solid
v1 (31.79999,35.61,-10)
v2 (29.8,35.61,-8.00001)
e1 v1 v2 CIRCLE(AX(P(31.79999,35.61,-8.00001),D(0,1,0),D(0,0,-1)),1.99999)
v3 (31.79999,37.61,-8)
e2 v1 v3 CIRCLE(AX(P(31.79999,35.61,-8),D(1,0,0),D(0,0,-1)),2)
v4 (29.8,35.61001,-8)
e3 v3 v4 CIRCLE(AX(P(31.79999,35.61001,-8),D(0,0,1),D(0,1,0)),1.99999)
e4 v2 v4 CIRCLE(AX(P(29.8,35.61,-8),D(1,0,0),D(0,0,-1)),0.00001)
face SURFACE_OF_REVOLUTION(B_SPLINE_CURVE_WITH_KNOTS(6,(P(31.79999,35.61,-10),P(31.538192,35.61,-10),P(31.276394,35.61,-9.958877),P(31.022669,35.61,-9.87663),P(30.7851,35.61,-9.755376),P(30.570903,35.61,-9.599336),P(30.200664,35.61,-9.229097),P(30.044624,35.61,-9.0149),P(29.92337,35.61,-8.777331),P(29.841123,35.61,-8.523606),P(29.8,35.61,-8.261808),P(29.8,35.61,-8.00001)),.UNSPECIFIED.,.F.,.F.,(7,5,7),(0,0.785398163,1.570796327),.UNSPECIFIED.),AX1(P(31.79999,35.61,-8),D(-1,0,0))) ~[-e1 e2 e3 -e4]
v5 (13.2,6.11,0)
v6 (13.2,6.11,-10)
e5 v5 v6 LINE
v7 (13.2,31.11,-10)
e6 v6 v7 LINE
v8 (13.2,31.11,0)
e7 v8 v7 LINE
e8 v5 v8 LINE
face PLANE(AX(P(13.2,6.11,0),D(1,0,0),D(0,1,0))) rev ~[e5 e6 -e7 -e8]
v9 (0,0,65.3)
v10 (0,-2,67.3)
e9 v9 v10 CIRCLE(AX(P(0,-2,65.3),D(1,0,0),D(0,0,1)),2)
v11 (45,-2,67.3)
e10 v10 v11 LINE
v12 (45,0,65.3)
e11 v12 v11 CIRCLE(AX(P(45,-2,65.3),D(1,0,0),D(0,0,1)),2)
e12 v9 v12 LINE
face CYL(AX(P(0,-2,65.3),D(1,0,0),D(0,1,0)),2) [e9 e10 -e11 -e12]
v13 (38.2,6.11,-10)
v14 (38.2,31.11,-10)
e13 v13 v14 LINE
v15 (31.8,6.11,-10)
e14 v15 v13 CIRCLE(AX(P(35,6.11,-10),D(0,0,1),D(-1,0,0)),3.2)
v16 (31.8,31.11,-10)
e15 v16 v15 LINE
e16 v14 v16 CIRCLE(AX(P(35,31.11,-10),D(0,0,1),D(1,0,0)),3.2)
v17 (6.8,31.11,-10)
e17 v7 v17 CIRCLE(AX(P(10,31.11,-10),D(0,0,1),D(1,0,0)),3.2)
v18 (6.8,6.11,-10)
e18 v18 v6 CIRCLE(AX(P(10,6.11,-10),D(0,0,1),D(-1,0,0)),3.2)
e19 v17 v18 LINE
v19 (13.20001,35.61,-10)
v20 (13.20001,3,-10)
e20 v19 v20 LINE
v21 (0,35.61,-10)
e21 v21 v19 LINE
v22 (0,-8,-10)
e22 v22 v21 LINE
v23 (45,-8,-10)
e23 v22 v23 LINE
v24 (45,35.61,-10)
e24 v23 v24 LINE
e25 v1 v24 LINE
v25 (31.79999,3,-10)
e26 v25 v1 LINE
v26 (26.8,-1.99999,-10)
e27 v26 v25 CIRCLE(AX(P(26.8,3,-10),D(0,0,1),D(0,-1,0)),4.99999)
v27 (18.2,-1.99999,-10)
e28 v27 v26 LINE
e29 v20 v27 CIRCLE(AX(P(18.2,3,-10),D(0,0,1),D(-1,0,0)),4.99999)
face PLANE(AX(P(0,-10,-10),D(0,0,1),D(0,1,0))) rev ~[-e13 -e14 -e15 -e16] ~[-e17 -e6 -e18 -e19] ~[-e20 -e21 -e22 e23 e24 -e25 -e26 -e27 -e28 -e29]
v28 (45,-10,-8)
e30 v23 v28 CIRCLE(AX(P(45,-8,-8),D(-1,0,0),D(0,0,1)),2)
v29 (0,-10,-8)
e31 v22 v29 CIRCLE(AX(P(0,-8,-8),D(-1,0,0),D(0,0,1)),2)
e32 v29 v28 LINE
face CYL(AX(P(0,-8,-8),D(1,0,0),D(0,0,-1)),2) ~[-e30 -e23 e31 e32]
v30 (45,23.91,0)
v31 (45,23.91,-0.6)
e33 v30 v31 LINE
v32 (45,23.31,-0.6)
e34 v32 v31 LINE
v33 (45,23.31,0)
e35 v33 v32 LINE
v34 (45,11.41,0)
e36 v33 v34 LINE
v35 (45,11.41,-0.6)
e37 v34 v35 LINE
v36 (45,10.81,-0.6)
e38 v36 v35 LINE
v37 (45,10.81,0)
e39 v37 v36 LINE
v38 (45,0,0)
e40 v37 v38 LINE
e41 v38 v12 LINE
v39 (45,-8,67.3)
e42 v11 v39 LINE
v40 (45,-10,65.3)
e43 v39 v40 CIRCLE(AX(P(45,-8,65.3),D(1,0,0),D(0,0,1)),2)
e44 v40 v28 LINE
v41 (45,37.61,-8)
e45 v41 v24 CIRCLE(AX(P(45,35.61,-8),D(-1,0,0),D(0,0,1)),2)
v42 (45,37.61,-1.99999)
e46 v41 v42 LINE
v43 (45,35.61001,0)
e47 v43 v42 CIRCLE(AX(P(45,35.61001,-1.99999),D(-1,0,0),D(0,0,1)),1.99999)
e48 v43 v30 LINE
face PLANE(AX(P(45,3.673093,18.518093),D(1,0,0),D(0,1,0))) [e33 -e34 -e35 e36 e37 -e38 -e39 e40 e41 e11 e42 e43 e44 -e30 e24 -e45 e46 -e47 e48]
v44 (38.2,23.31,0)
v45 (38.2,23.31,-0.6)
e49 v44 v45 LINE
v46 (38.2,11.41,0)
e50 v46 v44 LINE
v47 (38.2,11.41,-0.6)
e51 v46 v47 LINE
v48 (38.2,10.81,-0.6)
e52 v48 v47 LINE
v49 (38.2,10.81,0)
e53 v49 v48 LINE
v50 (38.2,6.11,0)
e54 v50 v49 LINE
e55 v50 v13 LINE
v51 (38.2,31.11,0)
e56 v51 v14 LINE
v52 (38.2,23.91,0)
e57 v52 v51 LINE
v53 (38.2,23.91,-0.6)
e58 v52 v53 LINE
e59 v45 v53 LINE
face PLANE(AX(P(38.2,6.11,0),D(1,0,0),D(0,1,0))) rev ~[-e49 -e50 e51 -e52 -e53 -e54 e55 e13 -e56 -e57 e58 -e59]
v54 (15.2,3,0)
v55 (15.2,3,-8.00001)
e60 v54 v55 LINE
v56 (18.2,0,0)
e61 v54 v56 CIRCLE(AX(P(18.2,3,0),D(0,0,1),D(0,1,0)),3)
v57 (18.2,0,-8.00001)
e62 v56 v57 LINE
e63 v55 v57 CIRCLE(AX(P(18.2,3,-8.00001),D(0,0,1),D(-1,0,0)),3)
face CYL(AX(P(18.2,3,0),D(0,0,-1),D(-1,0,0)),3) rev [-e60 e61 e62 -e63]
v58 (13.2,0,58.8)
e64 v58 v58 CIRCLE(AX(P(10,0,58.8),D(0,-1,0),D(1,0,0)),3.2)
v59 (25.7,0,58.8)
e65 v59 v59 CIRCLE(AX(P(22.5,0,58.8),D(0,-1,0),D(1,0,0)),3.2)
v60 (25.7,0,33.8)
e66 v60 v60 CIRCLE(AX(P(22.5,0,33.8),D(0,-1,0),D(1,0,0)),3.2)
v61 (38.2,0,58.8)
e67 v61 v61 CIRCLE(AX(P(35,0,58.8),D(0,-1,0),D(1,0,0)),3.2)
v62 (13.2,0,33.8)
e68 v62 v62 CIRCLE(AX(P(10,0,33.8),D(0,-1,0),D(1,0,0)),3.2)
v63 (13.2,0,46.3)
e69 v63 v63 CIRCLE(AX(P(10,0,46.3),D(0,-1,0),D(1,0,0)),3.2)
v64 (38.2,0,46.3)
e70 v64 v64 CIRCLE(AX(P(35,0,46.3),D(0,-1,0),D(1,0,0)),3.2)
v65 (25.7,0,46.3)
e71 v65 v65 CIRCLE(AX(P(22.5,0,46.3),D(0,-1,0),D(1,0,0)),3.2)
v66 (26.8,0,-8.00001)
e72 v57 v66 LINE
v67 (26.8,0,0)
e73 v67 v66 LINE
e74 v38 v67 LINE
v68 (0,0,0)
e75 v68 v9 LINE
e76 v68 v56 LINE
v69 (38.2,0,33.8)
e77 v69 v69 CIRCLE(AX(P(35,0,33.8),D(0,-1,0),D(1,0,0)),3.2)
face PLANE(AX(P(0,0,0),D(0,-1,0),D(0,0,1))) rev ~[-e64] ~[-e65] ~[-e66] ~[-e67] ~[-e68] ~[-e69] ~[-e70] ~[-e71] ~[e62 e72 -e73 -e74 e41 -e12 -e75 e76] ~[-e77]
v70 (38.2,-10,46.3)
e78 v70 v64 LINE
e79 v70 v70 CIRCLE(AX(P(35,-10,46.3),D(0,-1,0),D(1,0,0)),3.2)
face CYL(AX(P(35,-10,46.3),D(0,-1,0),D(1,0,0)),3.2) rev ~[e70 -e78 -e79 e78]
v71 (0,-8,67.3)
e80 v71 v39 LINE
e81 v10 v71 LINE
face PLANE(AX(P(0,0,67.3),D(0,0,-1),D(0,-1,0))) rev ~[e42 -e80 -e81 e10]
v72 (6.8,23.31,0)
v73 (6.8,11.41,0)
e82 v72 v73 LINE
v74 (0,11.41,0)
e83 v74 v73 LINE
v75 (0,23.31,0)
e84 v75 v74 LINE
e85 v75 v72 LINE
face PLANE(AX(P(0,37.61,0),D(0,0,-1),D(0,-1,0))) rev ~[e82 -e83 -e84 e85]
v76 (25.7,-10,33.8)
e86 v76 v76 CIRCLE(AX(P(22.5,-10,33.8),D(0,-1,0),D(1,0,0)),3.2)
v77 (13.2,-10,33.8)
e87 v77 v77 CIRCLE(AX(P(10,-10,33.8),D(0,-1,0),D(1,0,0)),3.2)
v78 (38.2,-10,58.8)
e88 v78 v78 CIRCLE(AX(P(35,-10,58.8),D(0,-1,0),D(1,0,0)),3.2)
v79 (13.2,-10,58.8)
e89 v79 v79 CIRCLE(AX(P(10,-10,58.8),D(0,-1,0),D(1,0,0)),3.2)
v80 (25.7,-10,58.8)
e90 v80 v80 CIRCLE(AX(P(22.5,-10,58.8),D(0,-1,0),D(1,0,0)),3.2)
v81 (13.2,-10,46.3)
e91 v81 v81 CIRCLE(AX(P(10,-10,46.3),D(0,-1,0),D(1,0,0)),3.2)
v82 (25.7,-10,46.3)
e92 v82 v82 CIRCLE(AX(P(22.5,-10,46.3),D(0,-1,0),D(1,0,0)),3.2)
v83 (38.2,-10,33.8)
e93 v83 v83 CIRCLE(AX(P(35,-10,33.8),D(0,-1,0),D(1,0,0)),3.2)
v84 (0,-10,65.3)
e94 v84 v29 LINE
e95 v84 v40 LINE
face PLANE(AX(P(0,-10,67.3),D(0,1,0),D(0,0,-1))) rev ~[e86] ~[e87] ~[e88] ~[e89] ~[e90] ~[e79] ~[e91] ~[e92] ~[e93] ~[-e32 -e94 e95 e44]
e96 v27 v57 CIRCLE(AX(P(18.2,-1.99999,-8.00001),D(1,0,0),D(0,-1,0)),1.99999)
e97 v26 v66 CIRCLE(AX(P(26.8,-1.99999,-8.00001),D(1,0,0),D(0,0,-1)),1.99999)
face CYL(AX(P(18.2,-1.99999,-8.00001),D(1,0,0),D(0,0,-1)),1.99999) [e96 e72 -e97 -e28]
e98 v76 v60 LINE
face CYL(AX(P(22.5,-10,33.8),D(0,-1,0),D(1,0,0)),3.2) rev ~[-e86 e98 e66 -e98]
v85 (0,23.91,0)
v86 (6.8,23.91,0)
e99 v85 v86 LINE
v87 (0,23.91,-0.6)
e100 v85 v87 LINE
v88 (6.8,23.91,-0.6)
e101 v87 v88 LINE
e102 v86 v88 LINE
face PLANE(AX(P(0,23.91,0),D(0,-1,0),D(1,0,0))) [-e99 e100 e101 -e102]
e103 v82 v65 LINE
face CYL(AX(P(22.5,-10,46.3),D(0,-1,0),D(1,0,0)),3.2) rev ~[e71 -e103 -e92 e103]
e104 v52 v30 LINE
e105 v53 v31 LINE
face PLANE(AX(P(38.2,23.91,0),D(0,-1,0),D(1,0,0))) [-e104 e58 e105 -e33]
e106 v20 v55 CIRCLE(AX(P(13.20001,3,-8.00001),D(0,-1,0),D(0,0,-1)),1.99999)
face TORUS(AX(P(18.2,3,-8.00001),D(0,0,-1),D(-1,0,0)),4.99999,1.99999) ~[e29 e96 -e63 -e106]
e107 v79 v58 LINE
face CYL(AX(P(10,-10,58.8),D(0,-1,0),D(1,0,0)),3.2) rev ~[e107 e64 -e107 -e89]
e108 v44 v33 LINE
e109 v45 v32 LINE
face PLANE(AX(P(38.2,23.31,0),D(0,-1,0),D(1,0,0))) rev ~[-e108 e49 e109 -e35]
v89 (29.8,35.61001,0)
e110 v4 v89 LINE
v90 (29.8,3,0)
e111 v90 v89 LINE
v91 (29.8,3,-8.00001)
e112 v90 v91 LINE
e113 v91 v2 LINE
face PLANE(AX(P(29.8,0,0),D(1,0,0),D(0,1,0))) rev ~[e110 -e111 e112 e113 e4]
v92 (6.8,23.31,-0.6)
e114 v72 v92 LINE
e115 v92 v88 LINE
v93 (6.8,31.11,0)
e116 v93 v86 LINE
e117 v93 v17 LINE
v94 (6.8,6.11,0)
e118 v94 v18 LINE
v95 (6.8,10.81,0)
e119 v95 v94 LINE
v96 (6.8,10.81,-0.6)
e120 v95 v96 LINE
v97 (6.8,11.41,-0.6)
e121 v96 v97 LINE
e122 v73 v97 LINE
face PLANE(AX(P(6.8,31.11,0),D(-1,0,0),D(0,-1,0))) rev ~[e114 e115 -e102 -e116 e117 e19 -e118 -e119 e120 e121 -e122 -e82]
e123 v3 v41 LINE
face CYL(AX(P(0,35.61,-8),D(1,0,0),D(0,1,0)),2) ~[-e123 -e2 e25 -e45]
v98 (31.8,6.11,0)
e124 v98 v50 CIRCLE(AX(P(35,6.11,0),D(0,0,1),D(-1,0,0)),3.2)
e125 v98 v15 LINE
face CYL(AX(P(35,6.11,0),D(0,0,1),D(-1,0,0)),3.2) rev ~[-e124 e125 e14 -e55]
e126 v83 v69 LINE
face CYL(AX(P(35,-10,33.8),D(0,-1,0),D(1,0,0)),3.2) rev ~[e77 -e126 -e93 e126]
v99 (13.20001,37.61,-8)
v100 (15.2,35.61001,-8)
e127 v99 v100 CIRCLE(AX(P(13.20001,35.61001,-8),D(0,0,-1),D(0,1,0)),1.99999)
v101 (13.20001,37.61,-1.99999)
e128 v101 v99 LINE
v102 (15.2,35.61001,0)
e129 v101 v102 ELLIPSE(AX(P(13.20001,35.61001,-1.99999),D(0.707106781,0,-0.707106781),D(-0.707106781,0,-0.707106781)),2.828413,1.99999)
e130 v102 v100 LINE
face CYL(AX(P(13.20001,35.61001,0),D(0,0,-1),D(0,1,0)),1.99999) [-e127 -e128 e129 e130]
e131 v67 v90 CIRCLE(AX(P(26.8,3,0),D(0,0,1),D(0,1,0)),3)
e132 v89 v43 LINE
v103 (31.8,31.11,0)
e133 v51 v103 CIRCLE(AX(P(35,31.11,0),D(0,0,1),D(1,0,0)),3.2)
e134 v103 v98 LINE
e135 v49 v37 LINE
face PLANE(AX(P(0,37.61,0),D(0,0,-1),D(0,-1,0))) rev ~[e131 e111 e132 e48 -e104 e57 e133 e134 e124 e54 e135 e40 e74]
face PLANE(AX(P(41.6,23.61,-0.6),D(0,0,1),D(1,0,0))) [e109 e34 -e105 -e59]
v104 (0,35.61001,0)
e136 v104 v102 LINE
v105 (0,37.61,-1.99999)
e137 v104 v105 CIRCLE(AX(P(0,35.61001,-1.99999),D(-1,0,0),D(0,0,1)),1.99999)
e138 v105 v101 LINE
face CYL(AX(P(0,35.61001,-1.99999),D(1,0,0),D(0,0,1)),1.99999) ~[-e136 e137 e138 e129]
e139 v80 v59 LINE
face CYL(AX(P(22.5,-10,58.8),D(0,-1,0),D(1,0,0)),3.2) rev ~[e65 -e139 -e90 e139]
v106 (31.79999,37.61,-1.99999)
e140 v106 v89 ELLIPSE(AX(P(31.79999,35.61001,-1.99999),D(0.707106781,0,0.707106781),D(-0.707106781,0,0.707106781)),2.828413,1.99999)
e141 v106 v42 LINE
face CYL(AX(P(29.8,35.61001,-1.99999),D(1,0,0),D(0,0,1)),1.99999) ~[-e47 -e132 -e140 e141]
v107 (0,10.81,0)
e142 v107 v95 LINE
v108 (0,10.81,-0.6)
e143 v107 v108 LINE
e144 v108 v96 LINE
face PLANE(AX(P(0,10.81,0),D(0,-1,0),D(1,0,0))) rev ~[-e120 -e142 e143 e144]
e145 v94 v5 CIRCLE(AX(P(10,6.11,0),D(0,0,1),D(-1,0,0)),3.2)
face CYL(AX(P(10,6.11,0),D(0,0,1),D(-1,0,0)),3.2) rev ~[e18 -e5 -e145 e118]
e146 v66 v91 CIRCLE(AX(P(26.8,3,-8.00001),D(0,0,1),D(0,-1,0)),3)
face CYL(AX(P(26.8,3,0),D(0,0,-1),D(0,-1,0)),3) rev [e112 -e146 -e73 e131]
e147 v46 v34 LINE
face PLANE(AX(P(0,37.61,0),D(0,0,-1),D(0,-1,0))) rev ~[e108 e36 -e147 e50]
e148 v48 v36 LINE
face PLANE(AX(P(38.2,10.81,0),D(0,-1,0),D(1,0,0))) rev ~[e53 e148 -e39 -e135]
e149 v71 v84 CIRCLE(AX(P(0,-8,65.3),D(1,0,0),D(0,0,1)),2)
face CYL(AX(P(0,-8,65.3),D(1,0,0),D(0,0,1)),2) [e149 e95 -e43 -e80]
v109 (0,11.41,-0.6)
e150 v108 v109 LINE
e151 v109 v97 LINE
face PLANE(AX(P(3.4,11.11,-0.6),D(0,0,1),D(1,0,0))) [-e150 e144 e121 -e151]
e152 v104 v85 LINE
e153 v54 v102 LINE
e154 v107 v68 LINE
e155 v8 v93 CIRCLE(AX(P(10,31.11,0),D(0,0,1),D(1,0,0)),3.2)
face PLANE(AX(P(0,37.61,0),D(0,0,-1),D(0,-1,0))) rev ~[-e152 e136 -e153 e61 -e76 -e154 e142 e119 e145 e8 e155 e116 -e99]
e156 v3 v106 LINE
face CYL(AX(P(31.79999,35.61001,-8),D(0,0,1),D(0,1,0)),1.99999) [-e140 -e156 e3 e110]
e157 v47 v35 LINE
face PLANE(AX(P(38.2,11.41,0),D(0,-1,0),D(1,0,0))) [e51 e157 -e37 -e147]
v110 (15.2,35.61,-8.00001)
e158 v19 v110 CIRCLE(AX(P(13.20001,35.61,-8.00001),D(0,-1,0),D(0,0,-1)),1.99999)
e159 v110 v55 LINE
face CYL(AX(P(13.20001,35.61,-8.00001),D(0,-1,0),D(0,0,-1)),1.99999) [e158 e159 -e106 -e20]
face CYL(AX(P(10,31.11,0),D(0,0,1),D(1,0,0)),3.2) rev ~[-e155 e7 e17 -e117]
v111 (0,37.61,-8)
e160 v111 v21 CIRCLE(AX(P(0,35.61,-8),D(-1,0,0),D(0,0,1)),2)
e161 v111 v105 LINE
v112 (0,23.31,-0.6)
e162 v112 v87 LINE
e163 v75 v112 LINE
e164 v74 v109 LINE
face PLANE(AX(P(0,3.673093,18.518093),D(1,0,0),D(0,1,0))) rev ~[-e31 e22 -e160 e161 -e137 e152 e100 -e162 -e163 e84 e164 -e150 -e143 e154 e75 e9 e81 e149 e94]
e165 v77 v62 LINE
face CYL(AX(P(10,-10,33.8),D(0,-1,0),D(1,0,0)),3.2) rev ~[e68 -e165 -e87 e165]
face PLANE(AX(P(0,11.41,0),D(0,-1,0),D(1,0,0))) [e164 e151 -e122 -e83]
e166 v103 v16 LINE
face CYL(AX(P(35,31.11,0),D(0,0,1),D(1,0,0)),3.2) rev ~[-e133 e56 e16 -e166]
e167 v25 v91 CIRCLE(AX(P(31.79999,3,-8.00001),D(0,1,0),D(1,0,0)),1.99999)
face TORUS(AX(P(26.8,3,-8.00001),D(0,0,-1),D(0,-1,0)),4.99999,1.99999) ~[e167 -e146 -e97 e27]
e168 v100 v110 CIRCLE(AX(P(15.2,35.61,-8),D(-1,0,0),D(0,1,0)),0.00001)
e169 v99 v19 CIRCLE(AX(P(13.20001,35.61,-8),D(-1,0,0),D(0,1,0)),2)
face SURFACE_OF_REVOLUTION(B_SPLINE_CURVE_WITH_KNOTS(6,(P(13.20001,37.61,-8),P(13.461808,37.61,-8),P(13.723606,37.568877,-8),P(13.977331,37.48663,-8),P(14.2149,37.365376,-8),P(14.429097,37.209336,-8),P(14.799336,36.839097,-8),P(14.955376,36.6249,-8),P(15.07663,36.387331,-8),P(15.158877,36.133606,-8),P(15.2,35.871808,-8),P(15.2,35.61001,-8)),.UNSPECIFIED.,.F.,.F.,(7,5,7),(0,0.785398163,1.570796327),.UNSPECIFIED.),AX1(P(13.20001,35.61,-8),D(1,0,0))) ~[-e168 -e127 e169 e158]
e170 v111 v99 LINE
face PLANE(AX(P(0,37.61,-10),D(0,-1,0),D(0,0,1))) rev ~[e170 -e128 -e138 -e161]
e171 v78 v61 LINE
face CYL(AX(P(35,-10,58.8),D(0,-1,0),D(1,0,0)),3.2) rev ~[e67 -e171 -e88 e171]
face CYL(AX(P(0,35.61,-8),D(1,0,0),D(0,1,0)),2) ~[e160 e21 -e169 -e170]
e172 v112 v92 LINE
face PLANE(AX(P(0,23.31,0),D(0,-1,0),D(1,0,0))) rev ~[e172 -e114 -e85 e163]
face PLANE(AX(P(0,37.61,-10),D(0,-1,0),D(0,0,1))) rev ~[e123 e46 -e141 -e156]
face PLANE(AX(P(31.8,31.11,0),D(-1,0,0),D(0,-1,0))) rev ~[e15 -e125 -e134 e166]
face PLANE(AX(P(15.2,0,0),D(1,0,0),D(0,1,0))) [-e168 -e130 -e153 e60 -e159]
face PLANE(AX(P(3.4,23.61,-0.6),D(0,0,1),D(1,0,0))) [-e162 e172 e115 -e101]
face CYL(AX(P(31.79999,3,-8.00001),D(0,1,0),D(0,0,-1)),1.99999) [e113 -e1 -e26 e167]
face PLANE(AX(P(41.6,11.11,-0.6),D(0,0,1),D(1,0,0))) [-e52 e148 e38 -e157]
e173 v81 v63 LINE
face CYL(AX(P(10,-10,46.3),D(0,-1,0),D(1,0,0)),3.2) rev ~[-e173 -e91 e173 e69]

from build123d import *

# Parameters (mm, degrees)
F1_DEPTH  = 45
F3_DEPTH  = 10
F4_R      = 2
F5_R      = 3.2
F6_DEPTH  = 10
F2_W      = 14.6
F2_H      = 37.61
F7_DEPTH  = 10
F8_R      = 3
F9_R      = 1.99999
F2_W_2    = 6.8
F2_H_2    = 0.6
F10_DEPTH = 0.6


# Not quite as in the source:
# - a fillet or chamfer is up to 0.001 mm smaller than in the source, because OpenCascade refuses the exact size
# - a feature names something its author has since deleted; it is built from what else it names


with BuildPart() as f1:
    # F0 (on Right) → F1 (new body)
    with BuildSketch(Plane.YZ):
        Polygon((37.61, 0), (0, 0), (0, 67.3), (-10, 67.3), (-10, -10), (37.61, -10), align=None)
    extrude(amount=F1_DEPTH)

    # F2 (on face) → F3 (cut)
    with BuildSketch(Plane.XY):
        with BuildLine():
            Line((13.2, 6.11), (13.2, 31.11))
            ThreePointArc((13.2, 31.11), (10, 34.31), (6.8, 31.11))
            Line((6.8, 31.11), (6.8, 23.91))
            Line((6.8, 23.91), (6.8, 23.31))
            Line((6.8, 23.31), (6.8, 11.41))
            Line((6.8, 11.41), (6.8, 10.81))
            Line((6.8, 10.81), (6.8, 6.11))
            ThreePointArc((6.8, 6.11), (10, 2.91), (13.2, 6.11))
        make_face()
        with BuildLine():
            Line((38.2, 23.31), (38.2, 23.91))
            Line((38.2, 23.91), (38.2, 31.11))
            ThreePointArc((38.2, 31.11), (35, 34.31), (31.8, 31.11))
            Line((31.8, 31.11), (31.8, 6.11))
            ThreePointArc((31.8, 6.11), (35, 2.91), (38.2, 6.11))
            Line((38.2, 6.11), (38.2, 10.81))
            Line((38.2, 10.81), (38.2, 11.41))
            Line((38.2, 11.41), (38.2, 23.31))
        make_face()
    extrude(amount=-F3_DEPTH, mode=Mode.SUBTRACT)

    # F4
    f4_edges = [f1.edges().sort_by_distance(p)[0] for p in [
        (22.5, 37.61, -10),
        (22.5, -10, -10),
        (22.5, 0, 67.3),
        (22.5, -10, 67.3),
    ]]
    fillet(f4_edges, radius=F4_R)

    # F5 (on face) → F6 (cut)
    with BuildSketch(Plane.XZ.offset(10)):
        with Locations((10, 58.8)):
            Circle(F5_R)
        with Locations((22.5, 58.8)):
            Circle(F5_R)
        with Locations((35, 58.8)):
            Circle(F5_R)
        with Locations((35, 46.3)):
            Circle(F5_R)
        with Locations((22.5, 46.3)):
            Circle(F5_R)
        with Locations((10, 46.3)):
            Circle(F5_R)
        with Locations((10, 33.8)):
            Circle(F5_R)
        with Locations((22.5, 33.8)):
            Circle(F5_R)
        with Locations((35, 33.8)):
            Circle(F5_R)
    extrude(amount=-F6_DEPTH, mode=Mode.SUBTRACT)

    # F2 (on face) → F7 (cut)
    with BuildSketch(Plane.XY):
        with Locations((22.5, 18.805)):
            Rectangle(F2_W, F2_H)
    extrude(amount=-F7_DEPTH, mode=Mode.SUBTRACT)

    # F8
    f8_edges = [f1.edges().sort_by_distance(p)[0] for p in [
        (29.8, 0, -5),
        (15.2, 0, -5),
    ]]
    fillet(f8_edges, radius=F8_R)

    # F9 (radius 2 in the source; OpenCascade refuses exactly that, so slightly less here)
    f9_edges = [f1.edges().sort_by_distance(p)[0] for p in [
        (15.2, 37.61, -4),
        (15.2, 37.024214, -9.414214),
        (37.4, 37.61, 0),
        (7.6, 37.61, 0),
    ]]
    fillet(f9_edges, radius=F9_R)

    # F2 (on face) → F10 (cut)
    with BuildSketch(Plane.XY):
        with Locations((3.4, 11.11)):
            Rectangle(F2_W_2, F2_H_2)
        with Locations((3.4, 23.61)):
            Rectangle(F2_W_2, F2_H_2)
        with Locations((41.6, 11.11)):
            Rectangle(F2_W_2, F2_H_2)
        with Locations((41.6, 23.61)):
            Rectangle(F2_W_2, F2_H_2)
    extrude(amount=-F10_DEPTH, mode=Mode.SUBTRACT)


solid = f1.part
